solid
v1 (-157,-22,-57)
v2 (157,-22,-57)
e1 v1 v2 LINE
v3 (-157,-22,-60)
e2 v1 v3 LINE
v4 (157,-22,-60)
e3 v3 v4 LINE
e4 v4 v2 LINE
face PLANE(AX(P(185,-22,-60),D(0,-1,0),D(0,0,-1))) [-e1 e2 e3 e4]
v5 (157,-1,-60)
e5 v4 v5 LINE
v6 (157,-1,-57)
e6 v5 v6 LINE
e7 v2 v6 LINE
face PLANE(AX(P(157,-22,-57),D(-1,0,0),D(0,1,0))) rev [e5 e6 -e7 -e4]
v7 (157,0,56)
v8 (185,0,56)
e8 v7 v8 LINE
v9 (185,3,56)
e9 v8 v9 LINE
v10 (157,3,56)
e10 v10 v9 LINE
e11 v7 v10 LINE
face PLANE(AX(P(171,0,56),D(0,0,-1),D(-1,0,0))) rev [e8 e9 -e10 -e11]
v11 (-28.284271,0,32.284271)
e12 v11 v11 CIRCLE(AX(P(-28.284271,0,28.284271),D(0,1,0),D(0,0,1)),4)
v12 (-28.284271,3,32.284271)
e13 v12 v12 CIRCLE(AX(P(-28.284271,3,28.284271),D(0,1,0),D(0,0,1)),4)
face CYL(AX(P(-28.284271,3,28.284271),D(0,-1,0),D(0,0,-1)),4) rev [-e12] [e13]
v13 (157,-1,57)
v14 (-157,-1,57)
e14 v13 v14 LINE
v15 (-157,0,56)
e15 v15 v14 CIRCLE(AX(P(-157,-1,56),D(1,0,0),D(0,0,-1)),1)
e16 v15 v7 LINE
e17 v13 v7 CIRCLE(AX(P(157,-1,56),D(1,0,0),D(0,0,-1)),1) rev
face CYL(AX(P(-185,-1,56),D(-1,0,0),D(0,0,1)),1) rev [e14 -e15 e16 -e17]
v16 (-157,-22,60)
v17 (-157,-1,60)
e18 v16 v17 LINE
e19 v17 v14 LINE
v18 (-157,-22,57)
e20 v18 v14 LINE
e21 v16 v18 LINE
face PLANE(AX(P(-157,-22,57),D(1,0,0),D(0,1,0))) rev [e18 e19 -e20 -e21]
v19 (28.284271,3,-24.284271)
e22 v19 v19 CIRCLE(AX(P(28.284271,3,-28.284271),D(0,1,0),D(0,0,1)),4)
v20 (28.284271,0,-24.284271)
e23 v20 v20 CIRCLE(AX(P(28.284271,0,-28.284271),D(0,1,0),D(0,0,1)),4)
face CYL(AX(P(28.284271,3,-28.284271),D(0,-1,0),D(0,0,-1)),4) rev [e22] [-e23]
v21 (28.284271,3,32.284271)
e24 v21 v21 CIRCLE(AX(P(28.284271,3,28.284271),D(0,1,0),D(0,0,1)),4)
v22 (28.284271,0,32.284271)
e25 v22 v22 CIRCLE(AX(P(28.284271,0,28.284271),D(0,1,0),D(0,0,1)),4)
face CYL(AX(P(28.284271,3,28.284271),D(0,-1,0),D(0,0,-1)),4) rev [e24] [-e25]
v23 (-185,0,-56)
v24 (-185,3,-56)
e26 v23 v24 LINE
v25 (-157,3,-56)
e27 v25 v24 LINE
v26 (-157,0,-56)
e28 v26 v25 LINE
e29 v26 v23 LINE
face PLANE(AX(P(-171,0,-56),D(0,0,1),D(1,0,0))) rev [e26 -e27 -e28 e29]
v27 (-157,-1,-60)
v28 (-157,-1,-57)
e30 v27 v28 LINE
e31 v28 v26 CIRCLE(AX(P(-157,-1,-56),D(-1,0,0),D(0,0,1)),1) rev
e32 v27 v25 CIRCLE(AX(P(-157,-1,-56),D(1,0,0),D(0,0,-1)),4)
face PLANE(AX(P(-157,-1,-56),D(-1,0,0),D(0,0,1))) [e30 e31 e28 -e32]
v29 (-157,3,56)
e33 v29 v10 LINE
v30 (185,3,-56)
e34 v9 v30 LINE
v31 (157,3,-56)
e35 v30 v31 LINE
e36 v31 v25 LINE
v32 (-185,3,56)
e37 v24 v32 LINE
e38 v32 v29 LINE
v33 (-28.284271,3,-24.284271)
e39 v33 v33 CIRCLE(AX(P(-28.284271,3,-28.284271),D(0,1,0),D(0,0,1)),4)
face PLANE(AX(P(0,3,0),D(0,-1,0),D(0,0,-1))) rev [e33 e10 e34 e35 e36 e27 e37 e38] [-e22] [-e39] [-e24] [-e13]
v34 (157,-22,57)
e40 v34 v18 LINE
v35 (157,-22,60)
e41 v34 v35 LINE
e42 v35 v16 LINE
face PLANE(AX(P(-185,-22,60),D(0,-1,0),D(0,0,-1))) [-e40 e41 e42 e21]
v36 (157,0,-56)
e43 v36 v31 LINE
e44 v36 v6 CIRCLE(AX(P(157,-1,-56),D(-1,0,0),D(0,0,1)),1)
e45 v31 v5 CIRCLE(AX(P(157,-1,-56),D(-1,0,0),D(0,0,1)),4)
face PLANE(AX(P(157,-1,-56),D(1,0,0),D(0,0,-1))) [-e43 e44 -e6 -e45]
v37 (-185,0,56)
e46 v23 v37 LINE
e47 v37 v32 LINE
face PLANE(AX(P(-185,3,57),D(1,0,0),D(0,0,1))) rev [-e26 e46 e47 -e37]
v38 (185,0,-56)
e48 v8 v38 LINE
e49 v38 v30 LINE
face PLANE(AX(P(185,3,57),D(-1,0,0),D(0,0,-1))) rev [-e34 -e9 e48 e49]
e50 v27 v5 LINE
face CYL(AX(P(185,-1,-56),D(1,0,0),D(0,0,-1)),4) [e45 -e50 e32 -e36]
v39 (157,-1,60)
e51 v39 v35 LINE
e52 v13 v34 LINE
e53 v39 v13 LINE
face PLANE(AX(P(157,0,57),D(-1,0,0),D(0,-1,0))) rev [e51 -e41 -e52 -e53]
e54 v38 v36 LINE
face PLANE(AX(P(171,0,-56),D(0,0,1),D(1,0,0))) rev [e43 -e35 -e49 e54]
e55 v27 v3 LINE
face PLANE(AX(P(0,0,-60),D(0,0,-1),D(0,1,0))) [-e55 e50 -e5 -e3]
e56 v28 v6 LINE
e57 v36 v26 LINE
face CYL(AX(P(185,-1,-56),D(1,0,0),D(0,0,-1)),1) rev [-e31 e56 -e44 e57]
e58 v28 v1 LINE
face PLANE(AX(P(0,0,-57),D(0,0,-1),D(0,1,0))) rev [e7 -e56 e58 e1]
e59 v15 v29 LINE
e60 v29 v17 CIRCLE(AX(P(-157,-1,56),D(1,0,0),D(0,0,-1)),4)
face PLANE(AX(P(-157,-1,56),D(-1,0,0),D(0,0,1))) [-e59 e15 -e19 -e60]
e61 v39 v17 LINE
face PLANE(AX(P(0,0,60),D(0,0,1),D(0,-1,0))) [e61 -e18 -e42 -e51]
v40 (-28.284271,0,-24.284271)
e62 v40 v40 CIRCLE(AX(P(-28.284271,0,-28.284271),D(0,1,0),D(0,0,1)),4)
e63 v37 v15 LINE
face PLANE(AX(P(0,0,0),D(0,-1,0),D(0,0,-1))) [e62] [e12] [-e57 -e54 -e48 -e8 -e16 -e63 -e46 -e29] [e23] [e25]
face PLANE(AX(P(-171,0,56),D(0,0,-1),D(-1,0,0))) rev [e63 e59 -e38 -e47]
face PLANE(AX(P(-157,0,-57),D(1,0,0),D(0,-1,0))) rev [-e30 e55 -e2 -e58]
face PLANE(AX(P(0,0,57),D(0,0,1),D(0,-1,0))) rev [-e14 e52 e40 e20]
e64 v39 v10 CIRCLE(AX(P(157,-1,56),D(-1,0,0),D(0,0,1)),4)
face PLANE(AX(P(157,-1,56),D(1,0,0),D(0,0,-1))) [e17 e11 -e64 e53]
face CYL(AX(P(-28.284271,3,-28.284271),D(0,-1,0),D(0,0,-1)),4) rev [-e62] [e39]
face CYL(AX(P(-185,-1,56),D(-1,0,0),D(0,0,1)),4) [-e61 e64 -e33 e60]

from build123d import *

# Parameters (mm, degrees)
SKETCH1_W                      = 370
SKETCH1_H                      = 114
SKETCH1_R                      = 4
BOSS_EXTRUDE1_DEPTH            = 3
EDGE_FLANGE1_STRIP_W           = 14
EDGE_FLANGE1_STRIP_H           = 3
EDGE_FLANGE1_STRIP_CUT_DEPTH   = 370
EDGE_FLANGE1_STRIP_2_W         = 14
EDGE_FLANGE1_STRIP_2_H         = 3
EDGE_FLANGE1_STRIP_CUT_2_DEPTH = 370
EDGE_FLANGE1_DEPTH             = 370
EDGE_FLANGE1_BEND_DEPTH        = 370
CUT_EXTRUDE2_START             = -185
CUT_EXTRUDE2_DEPTH             = 28
CUT_EXTRUDE2_START_2           = 157
CUT_EXTRUDE2_2_DEPTH           = 28


# Read off the part's stored shape, not the designer's step: Cut-Extrude2
# Sheet-metal steps are written as plain solids
with BuildPart() as part:
    # Sketch1 → Boss-Extrude1 (new body)
    with BuildSketch(Plane(origin=(0, 0, 0), x_dir=(1, 0, 0), z_dir=(0, 1, 0))):
        Rectangle(SKETCH1_W, SKETCH1_H)
        with Locations(Location((-28.284271247, 28.284271247, 0), (0, 0, 270))):
            Circle(SKETCH1_R, mode=Mode.SUBTRACT)
        with Locations(Location((28.284271247, 28.284271247, 0), (0, 0, 270))):
            Circle(SKETCH1_R, mode=Mode.SUBTRACT)
        with Locations(Location((28.284271247, -28.284271247, 0), (0, 0, 270))):
            Circle(SKETCH1_R, mode=Mode.SUBTRACT)
        with Locations(Location((-28.284271247, -28.284271247, 0), (0, 0, 270))):
            Circle(SKETCH1_R, mode=Mode.SUBTRACT)
    extrude(amount=BOSS_EXTRUDE1_DEPTH)

    # Edge-Flange1 strip (across the edge) → Edge-Flange1 strip cut (cut)
    with BuildSketch(Plane(origin=(185, 0, 57), x_dir=(0, 0, -1), z_dir=(-1, 0, 0))):
        with Locations((-6, -1.5)):
            Rectangle(EDGE_FLANGE1_STRIP_W, EDGE_FLANGE1_STRIP_H)
    extrude(amount=EDGE_FLANGE1_STRIP_CUT_DEPTH, mode=Mode.SUBTRACT)

    # Edge-Flange1 strip 2 (across the edge) → Edge-Flange1 strip cut 2 (cut)
    with BuildSketch(Plane(origin=(-185, 0, -57), x_dir=(0, 0, 1), z_dir=(1, 0, 0))):
        with Locations((-6, -1.5)):
            Rectangle(EDGE_FLANGE1_STRIP_2_W, EDGE_FLANGE1_STRIP_2_H)
    extrude(amount=EDGE_FLANGE1_STRIP_CUT_2_DEPTH, mode=Mode.SUBTRACT)

    # Edge-Flange1 section (across the edge) → Edge-Flange1 (add)
    with BuildSketch(Plane(origin=(185, 0, 57), x_dir=(0, 0, -1), z_dir=(-1, 0, 0))):
        with BuildLine():
            Line((-3, 1), (-3, 22))
            Line((-3, 22), (0, 22))
            Line((0, 22), (0, 1))
            ThreePointArc((0, 1), (0.292893219, 0.292893219), (1, 0))
            Line((1, 0), (1, -3))
            ThreePointArc((1, -3), (-1.828427125, -1.828427125), (-3, 1))
        make_face()
    extrude(amount=EDGE_FLANGE1_DEPTH)

    # Edge-Flange1 section 2 (across the edge) → Edge-Flange1 bend (add)
    with BuildSketch(Plane(origin=(-185, 0, -57), x_dir=(0, 0, 1), z_dir=(1, 0, 0))):
        with BuildLine():
            Line((-3, 1), (-3, 22))
            Line((-3, 22), (0, 22))
            Line((0, 22), (0, 1))
            ThreePointArc((0, 1), (0.292893219, 0.292893219), (1, 0))
            Line((1, 0), (1, -3))
            ThreePointArc((1, -3), (-1.828427125, -1.828427125), (-3, 1))
        make_face()
    extrude(amount=EDGE_FLANGE1_BEND_DEPTH)

    # Cut-Extrude2 outline → Cut-Extrude2 (cut)
    with BuildSketch(Plane.YZ.offset(CUT_EXTRUDE2_START)):
        with BuildLine():
            ThreePointArc((-1, -60), (1.828427125, -58.828427125), (3, -56))
            Line((3, -56), (0, -56))
            ThreePointArc((0, -56), (-0.292893219, -56.707106781), (-1, -57))
            Line((-1, -57), (-22, -57))
            Line((-22, -57), (-22, -60))
            Line((-22, -60), (-1, -60))
        make_face()
        with BuildLine():
            ThreePointArc((-1, 57), (-0.292893219, 56.707106781), (0, 56))
            Line((0, 56), (3, 56))
            ThreePointArc((3, 56), (1.828427125, 58.828427125), (-1, 60))
            Line((-1, 60), (-22, 60))
            Line((-22, 60), (-22, 57))
            Line((-22, 57), (-1, 57))
        make_face()
    extrude(amount=CUT_EXTRUDE2_DEPTH, mode=Mode.SUBTRACT)

    # Cut-Extrude2 2 outline → Cut-Extrude2 2 (cut)
    with BuildSketch(Plane.YZ.offset(CUT_EXTRUDE2_START_2)):
        with BuildLine():
            ThreePointArc((-1, -60), (1.828427125, -58.828427125), (3, -56))
            Line((3, -56), (0, -56))
            ThreePointArc((0, -56), (-0.292893219, -56.707106781), (-1, -57))
            Line((-1, -57), (-22, -57))
            Line((-22, -57), (-22, -60))
            Line((-22, -60), (-1, -60))
        make_face()
        with BuildLine():
            ThreePointArc((-1, 57), (-0.292893219, 56.707106781), (0, 56))
            Line((0, 56), (3, 56))
            ThreePointArc((3, 56), (1.828427125, 58.828427125), (-1, 60))
            Line((-1, 60), (-22, 60))
            Line((-22, 60), (-22, 57))
            Line((-22, 57), (-1, 57))
        make_face()
    extrude(amount=CUT_EXTRUDE2_2_DEPTH, mode=Mode.SUBTRACT)


solid = part.part
